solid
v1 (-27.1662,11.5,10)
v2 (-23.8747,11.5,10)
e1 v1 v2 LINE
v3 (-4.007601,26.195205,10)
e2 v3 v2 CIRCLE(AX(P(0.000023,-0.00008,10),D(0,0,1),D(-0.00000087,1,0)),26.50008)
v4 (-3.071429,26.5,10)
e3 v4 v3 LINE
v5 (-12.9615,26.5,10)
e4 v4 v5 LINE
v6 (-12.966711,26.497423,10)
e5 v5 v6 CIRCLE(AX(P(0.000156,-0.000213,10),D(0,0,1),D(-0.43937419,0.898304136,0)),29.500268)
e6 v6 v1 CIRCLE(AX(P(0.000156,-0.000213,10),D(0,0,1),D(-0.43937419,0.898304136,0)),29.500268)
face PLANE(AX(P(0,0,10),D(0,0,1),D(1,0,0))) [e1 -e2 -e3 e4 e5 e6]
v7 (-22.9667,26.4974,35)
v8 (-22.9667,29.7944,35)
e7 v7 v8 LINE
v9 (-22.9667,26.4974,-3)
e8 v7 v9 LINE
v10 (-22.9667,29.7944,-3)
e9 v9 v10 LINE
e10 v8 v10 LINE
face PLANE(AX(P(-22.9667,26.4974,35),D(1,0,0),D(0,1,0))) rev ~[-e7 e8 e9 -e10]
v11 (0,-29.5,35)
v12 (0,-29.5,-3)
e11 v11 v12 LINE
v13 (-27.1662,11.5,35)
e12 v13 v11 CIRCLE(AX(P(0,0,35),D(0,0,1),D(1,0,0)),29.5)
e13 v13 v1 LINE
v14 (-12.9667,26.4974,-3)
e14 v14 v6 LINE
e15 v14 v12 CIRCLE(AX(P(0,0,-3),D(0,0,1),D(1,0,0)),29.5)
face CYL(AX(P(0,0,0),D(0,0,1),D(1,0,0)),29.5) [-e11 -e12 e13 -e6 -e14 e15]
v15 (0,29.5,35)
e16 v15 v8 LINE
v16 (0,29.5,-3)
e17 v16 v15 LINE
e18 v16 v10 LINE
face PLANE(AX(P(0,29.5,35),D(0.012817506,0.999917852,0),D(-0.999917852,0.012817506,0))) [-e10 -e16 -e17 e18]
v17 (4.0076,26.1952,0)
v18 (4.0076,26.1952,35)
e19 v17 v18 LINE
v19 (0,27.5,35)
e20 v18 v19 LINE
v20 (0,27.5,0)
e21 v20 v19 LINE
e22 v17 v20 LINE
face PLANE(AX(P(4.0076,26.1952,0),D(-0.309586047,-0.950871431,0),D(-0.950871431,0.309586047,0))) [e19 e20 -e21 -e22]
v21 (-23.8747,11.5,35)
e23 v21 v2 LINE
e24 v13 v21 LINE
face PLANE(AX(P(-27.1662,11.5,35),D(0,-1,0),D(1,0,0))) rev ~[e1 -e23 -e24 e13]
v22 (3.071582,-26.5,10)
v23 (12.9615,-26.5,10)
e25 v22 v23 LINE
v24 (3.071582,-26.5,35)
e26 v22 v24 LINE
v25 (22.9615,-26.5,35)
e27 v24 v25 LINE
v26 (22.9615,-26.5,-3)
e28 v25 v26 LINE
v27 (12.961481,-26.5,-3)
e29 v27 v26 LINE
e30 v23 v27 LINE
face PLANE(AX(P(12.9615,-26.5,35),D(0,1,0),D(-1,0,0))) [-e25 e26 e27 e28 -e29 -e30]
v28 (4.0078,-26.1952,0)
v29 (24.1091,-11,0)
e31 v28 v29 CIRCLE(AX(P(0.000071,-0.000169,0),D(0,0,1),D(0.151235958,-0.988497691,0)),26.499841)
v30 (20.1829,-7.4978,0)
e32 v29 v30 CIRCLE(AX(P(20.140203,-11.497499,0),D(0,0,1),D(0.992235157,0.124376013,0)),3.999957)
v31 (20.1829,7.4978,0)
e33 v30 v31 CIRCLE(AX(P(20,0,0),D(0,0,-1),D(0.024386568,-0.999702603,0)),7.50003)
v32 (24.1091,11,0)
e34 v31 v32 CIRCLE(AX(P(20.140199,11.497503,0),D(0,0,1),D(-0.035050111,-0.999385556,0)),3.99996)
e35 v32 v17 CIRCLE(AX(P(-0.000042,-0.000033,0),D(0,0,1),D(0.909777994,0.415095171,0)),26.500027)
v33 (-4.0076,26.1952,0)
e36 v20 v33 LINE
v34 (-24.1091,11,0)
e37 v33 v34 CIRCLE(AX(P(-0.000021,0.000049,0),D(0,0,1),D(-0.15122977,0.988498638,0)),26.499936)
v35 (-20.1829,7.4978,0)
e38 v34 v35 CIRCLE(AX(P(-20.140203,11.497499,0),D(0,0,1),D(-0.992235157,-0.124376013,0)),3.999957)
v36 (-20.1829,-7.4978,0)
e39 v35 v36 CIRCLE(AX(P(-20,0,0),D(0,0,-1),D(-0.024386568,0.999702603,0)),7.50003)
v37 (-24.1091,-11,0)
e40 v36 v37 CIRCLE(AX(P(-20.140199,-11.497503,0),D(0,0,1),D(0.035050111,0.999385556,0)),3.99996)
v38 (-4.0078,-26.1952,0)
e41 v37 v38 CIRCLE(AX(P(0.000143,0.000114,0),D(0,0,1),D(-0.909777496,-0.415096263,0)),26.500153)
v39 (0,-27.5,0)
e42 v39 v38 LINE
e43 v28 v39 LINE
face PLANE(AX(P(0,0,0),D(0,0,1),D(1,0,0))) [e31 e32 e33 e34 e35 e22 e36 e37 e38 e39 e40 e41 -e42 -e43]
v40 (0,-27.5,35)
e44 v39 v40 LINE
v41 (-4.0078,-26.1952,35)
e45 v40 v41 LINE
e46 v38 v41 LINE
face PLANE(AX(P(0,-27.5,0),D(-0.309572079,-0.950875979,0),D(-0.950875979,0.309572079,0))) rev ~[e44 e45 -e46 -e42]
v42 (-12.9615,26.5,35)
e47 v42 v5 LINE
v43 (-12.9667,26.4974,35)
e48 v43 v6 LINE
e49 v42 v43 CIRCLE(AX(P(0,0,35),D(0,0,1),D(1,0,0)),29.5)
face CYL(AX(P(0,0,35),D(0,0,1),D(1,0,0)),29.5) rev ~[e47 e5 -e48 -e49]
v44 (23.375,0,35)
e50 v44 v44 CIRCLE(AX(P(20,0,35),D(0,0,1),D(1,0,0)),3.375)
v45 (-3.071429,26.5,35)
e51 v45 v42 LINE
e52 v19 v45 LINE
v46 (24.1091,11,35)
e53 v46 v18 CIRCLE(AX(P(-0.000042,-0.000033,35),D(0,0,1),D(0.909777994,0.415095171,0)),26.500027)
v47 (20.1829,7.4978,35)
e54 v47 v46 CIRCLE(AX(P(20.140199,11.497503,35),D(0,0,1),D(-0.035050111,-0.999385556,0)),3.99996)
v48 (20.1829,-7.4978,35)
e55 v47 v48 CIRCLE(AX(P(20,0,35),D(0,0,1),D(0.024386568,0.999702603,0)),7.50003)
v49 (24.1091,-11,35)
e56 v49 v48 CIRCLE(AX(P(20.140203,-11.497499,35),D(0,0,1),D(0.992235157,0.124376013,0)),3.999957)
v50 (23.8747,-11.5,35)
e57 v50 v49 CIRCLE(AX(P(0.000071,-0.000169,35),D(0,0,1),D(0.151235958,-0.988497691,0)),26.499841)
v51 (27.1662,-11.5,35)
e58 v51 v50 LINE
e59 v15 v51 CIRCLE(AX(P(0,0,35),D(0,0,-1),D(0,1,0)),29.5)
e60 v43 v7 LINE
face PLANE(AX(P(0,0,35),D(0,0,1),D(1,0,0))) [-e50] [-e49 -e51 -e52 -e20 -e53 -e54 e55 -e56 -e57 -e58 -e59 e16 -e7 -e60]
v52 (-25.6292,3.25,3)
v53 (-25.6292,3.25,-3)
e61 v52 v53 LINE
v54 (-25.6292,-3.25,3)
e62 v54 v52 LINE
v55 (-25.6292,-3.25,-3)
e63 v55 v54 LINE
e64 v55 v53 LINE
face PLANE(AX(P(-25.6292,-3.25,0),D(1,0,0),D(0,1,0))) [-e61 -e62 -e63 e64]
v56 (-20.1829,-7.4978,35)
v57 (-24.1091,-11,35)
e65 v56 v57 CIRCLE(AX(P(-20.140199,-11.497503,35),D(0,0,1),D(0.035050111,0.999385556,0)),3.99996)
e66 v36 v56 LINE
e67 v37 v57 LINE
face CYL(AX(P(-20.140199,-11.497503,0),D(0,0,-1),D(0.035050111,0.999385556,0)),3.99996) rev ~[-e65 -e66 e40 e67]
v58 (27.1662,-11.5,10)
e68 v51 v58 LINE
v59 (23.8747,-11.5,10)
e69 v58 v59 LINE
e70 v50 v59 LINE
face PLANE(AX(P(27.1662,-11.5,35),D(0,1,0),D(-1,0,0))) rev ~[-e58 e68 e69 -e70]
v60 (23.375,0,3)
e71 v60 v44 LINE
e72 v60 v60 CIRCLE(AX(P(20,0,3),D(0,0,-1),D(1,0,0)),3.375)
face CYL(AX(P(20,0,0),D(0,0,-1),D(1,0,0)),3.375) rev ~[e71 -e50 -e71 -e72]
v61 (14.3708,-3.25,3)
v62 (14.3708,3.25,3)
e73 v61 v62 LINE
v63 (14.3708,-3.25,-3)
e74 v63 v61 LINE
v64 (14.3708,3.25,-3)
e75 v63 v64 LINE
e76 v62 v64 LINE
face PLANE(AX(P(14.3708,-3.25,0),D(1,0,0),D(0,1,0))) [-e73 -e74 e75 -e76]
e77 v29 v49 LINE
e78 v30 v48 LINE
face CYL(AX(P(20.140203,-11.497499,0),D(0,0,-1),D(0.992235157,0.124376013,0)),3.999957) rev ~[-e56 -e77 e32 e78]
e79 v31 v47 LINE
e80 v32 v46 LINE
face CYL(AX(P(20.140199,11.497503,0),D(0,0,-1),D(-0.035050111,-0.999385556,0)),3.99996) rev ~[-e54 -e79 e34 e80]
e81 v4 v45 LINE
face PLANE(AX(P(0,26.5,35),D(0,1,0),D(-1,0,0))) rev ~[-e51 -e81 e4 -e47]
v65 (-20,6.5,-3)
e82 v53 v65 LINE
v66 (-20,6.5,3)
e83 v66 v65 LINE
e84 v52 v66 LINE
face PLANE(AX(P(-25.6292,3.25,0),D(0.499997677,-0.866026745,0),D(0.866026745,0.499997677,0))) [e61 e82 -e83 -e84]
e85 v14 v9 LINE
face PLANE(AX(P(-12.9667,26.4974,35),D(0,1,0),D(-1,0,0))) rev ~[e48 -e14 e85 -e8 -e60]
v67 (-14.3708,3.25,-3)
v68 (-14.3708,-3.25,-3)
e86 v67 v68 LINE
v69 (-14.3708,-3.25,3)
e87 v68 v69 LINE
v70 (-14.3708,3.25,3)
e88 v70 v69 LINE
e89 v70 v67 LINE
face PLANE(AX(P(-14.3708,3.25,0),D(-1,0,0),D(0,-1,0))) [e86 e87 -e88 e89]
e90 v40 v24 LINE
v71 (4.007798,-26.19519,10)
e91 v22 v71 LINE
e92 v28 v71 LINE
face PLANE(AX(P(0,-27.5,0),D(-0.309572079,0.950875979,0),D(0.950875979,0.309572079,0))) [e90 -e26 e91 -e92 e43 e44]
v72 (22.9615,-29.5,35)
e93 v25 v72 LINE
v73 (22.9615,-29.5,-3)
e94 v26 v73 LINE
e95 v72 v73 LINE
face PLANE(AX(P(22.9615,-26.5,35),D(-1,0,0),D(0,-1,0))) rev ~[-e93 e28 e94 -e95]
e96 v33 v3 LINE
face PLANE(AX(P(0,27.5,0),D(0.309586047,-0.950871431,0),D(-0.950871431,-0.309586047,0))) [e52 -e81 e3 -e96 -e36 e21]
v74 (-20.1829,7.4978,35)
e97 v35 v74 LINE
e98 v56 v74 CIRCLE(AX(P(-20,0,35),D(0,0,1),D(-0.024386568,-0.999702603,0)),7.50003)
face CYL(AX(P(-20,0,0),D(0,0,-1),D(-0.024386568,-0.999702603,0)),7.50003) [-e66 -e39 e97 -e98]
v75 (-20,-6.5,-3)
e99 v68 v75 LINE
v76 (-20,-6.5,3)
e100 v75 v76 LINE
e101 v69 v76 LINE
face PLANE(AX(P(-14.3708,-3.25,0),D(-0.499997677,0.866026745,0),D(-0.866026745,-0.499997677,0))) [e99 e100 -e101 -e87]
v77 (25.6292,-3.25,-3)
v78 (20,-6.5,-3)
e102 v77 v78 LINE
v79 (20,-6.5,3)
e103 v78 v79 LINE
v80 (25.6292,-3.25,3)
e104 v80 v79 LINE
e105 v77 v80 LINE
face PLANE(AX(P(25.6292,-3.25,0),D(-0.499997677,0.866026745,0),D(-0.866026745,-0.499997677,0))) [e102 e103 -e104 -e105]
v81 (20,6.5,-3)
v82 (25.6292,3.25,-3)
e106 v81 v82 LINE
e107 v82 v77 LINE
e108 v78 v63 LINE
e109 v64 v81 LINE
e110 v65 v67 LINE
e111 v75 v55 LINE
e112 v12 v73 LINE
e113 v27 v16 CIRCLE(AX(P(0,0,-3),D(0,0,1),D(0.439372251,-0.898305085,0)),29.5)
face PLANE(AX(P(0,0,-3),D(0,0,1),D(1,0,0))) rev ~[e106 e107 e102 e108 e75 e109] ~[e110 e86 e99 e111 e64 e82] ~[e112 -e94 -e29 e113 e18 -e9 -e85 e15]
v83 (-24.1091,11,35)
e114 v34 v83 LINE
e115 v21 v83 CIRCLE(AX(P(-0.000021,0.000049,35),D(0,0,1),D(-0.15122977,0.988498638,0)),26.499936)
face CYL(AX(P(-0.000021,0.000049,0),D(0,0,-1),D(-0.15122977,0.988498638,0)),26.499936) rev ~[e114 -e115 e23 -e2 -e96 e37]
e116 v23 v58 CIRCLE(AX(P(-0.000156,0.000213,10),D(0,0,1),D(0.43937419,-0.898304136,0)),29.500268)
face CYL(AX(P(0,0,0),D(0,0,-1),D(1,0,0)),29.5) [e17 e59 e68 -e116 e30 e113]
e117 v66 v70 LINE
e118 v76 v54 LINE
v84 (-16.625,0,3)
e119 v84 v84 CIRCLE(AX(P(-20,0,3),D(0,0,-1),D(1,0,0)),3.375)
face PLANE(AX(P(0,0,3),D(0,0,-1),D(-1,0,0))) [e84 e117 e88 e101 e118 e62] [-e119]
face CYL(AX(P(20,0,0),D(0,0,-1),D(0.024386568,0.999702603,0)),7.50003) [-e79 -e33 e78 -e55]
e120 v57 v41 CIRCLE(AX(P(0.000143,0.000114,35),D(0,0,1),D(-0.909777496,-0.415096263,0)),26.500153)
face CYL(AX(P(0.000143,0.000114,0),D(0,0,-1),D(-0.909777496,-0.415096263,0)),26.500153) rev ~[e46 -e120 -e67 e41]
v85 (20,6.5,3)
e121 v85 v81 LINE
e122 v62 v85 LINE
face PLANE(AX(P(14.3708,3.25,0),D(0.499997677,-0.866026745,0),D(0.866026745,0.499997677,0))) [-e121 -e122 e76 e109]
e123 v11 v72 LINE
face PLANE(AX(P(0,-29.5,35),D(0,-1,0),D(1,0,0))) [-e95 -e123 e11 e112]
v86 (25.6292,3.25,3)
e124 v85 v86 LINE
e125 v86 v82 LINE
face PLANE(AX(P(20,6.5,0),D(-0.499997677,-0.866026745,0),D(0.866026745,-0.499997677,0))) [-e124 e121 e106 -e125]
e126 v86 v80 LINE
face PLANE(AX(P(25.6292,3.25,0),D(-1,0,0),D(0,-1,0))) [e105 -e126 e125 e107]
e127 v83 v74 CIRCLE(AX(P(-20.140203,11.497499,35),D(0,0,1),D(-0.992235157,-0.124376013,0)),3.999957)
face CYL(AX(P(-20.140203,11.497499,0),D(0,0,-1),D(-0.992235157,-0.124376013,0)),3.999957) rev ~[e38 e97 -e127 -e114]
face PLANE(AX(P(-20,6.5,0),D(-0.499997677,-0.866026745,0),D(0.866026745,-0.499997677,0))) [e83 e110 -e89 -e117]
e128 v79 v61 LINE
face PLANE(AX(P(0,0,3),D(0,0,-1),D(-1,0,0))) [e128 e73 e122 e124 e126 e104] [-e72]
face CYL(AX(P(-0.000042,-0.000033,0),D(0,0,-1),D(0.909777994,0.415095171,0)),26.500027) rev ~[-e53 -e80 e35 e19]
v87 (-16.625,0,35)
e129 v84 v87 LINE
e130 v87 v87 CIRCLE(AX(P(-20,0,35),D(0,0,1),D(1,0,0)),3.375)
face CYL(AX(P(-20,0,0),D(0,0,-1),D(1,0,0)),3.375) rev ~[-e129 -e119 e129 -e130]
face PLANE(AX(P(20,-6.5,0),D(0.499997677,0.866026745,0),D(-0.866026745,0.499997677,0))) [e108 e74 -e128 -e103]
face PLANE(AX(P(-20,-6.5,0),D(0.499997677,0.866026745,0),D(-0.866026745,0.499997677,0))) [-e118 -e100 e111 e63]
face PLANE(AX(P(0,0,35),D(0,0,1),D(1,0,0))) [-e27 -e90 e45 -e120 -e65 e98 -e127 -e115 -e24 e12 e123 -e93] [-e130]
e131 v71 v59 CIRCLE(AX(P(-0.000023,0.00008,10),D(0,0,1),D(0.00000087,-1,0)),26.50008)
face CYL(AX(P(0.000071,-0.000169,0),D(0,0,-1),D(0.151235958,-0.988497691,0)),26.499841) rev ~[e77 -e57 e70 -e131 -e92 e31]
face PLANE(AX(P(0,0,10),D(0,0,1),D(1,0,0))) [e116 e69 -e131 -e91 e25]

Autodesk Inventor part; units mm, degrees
ref_plane "YZ Plane" through (0, 0, 0) normal (1, 0, 0) x (0, 1, 0)
ref_plane "XZ Plane" through (0, 0, 0) normal (0, 1, 0) x (-1, 0, 0)
ref_plane "XY Plane" through (0, 0, 0) normal (0, 0, 1) x (1, 0, 0)
sketch "Sketch1" plane through (0, 0, 0) normal (0, 0, 1) x (1, 0, 0)
  circle A0 centre (0, 0) radius 29.5
  circle A1 centre (20, 0) radius 3.375
  circle A2 centre (-20, 0) radius 3.375
  line L0 (0, -27.5) -> (-4.0078, -26.1952)
  line L1 (0, -27.5) -> (4.0078, -26.1952)
  arc A3 (-24.1091, -11) -> (-4.0078, -26.1952) centre (0, 0) ccw
  arc A4 (4.0078, -26.1952) -> (24.1091, -11) centre (0, 0) ccw
  line L2 (4.0076, 26.1952) -> (0, 27.5)
  line L3 (0, 27.5) -> (-4.0076, 26.1952)
  arc A5 (24.1091, 11) -> (4.0076, 26.1952) centre (0, 0) ccw
  arc A6 (-4.0076, 26.1952) -> (-24.1091, 11) centre (0, 0) ccw
  arc A7 (20.1829, 7.4978) -> (20.1829, -7.4978) centre (20, 0) ccw
  arc A8 (-20.1829, -7.4978) -> (-20.1829, 7.4978) centre (-20, 0) ccw
  arc A9 (-20, -7.5) -> (-24.1091, -11) centre (-20.1402, -11.4975) ccw
  arc A10 (-24.1091, 11) -> (-20, 7.5) centre (-20.1402, 11.4975) ccw
  arc A11 (24.1091, -11) -> (20, -7.5) centre (20.1402, -11.4975) ccw
  arc A12 (20, 7.5) -> (24.1091, 11) centre (20.1402, 11.4975) ccw
  dimension "d46" = 59
  dimension "d49" = 6.75
  dimension "d50" = 6.75
  dimension "d105" = 4
  dimension "d106" = 4
  dimension "d107" = 4
  dimension "d109" = 4
extrude "Extrusion1" add sketch "Sketch1" along normal blind 35
sketch "Sketch9" plane through (0, 0, 0) normal (0, 0, -1) x (-1, 0, 0)
  circle A0 centre (-20, 0) radius 3.375
  circle A1 centre (20, 0) radius 3.375
  line L0 (20, -6.5) -> (25.6292, -3.25)
  line L1 (25.6292, -3.25) -> (25.6292, 3.25)
  line L2 (25.6292, 3.25) -> (20, 6.5)
  line L3 (20, 6.5) -> (14.3708, 3.25)
  line L4 (14.3708, 3.25) -> (14.3708, -3.25)
  line L5 (14.3708, -3.25) -> (20, -6.5)
  line L6 (-20, -6.5) -> (-14.3708, -3.25)
  line L7 (-14.3708, -3.25) -> (-14.3708, 3.25)
  line L8 (-14.3708, 3.25) -> (-20, 6.5)
  line L9 (-20, 6.5) -> (-25.6292, 3.25)
  line L10 (-25.6292, 3.25) -> (-25.6292, -3.25)
  line L11 (-25.6292, -3.25) -> (-20, -6.5)
  point P0 (0, 0)
  point P1 (0, 0)
extrude "Extrusion11" cut sketch "Sketch9" against normal blind 3
extrude "Extrusion12" add sketch "Sketch1" against normal blind 3 contours A0 | L0 A3 A9 A8 A10 A6 L3 L2 A5 A12 A7 A11 A4 L1
extrude "Extrusion13" cut sketch "Sketch9" along normal blind 3
sketch "Sketch10" plane through (0, 0, 35) normal (0, 0, 1) x (1, 0, 0)
  arc A0 (-24.1091, -11) -> (-4.0078, -26.1952) centre (0, 0) ccw projected
  line L0 (0, -26.5) -> (12.9615, -26.5)
  line L1 (27.1662, -11.5) -> (23.8747, -11.5)
  arc A1 (24.1091, 11) -> (4.0076, 26.1952) centre (0, 0) ccw projected
  line L2 (0, 26.5) -> (-12.9615, 26.5)
  line L3 (-27.1662, 11.5) -> (-23.8747, 11.5)
  arc A2 (12.9615, -26.5) -> (27.1662, -11.5) centre (0, 0) ccw
  arc A3 (-12.9615, 26.5) -> (-27.1662, 11.5) centre (0, 0) ccw
  arc A4 (0, -26.5) -> (23.8747, -11.5) centre (0, 0) ccw
  arc A5 (0, 26.5) -> (-23.8747, 11.5) centre (0, 0) ccw
  point P0 (24.1091, -11)
  point P1 (-24.1091, 11)
extrude "Extrusion14" cut sketch "Sketch10" against normal blind 25
sketch "Sketch11" plane through (0, 0, 35) normal (0, 0, 1) x (1, 0, 0)
  line L0 (12.9615, -26.5) -> (3.0715, -26.5) projected
  line L1 (12.9615, -26.5) -> (22.9615, -26.5)
  line L2 (22.9615, -26.5) -> (22.9615, -29.5)
  arc A0 (-27.1662, 11.5) -> (12.9615, -26.5) centre (0, 0) ccw projected
  line L3 (0, -29.5) -> (22.9615, -29.5)
  line L4 (12.9615, -26.5) -> (3.0715, -26.5)
  line L5 (3.0715, -26.5) -> (0, -27.5) projected
  line L6 (0, -27.5) -> (0, -29.5)
  circle A1 centre (0, 0) radius 29.5 projected
  line L7 (-12.9667, 26.4974) -> (-22.9667, 26.4974)
  line L8 (-22.9667, 26.4974) -> (-22.9667, 29.7944)
  line L9 (0, 29.5) -> (-22.9667, 29.7944)
  line L10 (-12.9667, 26.4974) -> (-3.0793, 26.4974)
  line L11 (0, 27.5) -> (-4.0076, 26.1952) projected
  line L12 (0, 27.5) -> (0, 29.5)
  dimension "d93" = 10
  dimension "d94" = 10
extrude "Extrusion15" add sketch "Sketch11" against normal blind 38 contours A0 L6 L5 L0 | L1 L2 L3 A0 | A1 L7 L8 L9
properties part number "BatteryIsolator"
